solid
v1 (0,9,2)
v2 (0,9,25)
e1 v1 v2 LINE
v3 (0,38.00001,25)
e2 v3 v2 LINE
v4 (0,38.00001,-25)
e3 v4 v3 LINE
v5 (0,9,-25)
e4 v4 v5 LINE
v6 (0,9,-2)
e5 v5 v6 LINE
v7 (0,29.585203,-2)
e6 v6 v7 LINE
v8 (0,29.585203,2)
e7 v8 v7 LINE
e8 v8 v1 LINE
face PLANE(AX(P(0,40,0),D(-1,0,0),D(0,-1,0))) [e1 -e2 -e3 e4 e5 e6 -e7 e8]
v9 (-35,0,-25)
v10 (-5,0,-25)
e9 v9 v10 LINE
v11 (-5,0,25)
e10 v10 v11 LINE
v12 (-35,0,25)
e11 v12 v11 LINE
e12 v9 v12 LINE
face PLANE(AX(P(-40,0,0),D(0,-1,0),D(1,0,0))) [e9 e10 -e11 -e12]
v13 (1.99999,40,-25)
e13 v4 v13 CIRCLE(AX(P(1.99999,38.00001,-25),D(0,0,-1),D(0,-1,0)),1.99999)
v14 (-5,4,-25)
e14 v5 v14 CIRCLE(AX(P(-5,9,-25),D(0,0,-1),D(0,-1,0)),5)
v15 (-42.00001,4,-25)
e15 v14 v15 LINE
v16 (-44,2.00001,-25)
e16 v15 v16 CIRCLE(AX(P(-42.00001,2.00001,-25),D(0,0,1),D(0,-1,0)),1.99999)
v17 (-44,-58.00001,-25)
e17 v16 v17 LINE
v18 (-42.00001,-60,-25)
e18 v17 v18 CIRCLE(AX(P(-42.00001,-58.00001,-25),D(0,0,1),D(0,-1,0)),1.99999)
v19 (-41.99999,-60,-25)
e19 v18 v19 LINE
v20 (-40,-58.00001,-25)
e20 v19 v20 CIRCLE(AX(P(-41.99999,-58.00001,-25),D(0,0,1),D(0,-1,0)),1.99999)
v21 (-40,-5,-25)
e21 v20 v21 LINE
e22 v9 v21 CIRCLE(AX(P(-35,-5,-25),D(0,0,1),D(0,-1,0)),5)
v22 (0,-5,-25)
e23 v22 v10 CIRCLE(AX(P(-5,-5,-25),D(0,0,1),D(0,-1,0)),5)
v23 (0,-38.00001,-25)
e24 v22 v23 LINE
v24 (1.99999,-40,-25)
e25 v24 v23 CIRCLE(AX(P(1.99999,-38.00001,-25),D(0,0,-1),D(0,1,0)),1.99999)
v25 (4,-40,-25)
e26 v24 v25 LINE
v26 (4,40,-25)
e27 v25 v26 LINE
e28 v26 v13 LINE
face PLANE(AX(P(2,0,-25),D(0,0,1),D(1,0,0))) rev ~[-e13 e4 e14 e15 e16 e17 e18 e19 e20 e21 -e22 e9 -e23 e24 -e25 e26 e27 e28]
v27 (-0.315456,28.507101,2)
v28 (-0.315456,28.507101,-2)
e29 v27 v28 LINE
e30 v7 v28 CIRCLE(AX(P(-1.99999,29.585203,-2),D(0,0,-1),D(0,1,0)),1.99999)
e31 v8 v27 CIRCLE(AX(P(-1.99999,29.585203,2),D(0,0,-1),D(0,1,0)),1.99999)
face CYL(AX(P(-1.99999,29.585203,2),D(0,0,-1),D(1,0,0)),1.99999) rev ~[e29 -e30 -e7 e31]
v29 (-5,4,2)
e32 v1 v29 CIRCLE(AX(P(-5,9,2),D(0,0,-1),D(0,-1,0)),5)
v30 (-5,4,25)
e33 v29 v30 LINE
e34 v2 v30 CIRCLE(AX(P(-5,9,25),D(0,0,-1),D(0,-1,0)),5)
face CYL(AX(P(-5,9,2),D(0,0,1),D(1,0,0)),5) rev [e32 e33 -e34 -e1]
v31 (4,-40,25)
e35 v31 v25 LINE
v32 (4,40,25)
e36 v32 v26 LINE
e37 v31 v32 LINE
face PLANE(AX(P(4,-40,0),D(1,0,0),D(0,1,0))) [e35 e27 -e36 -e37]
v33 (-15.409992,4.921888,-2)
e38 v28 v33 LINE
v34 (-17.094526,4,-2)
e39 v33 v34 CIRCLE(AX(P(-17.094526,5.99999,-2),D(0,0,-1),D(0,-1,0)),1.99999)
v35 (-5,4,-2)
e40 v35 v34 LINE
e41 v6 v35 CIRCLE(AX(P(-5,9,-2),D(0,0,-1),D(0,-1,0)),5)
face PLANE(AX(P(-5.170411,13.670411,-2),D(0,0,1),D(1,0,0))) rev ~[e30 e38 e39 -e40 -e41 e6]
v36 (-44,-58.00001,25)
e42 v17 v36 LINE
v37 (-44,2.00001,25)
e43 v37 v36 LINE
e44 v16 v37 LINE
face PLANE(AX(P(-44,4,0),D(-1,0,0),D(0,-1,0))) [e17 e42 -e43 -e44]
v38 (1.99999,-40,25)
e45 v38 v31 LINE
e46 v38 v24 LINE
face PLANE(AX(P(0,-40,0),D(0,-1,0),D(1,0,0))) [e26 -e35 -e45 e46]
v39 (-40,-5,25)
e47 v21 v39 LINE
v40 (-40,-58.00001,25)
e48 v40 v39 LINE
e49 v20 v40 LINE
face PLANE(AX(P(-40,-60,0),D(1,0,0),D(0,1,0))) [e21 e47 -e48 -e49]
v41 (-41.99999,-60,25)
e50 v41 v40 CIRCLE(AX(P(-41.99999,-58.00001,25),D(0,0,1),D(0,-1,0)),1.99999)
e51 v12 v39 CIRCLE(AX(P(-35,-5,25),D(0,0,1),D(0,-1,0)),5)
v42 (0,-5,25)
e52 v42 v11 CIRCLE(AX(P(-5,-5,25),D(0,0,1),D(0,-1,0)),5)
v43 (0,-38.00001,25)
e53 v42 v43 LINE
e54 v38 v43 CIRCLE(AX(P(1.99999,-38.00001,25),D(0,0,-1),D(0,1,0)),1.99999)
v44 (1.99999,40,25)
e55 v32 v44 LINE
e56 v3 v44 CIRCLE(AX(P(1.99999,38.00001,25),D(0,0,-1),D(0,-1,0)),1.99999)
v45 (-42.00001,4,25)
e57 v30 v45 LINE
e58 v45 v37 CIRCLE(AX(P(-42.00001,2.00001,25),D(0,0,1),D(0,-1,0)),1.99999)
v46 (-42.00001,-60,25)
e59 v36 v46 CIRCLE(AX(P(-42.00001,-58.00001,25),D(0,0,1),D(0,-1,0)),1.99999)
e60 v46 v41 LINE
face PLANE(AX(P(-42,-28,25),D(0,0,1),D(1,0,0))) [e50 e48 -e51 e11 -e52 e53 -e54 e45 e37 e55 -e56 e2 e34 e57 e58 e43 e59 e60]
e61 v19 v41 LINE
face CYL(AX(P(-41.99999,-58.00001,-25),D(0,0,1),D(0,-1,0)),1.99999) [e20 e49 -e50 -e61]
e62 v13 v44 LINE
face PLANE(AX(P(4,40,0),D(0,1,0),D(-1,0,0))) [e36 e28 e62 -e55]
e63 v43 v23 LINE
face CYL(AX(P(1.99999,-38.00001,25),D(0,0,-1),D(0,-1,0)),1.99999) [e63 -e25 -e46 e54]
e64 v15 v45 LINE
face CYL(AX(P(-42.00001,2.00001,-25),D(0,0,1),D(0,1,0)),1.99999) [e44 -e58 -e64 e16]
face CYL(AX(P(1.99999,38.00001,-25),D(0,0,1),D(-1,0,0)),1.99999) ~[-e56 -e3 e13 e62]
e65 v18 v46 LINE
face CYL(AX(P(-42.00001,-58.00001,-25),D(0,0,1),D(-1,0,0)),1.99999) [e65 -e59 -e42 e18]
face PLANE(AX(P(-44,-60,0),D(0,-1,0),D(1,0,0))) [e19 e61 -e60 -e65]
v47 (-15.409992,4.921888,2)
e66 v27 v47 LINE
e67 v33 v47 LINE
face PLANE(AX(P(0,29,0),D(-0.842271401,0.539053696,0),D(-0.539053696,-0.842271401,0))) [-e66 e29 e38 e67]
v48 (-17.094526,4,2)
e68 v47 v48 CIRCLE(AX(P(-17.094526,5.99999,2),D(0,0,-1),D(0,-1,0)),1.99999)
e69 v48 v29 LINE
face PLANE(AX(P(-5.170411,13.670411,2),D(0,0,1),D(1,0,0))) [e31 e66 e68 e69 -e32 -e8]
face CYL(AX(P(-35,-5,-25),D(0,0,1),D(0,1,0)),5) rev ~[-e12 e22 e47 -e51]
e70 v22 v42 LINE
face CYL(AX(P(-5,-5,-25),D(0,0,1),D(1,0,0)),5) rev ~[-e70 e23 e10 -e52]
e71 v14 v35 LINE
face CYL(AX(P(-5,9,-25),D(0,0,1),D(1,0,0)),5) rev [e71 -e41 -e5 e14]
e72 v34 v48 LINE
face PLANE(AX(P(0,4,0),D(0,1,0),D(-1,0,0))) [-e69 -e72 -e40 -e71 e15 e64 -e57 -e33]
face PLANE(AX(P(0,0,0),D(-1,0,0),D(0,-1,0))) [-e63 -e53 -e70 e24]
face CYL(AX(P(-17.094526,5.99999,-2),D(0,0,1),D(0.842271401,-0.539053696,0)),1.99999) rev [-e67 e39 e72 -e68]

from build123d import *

# Parameters (mm, degrees)
F1_DEPTH      = 25
F2_DEPTH      = 25
F3_DEPTH      = 2
F3_DEPTH_BACK = 2
F4_R          = 5
F5_R          = 1.99999


# Not quite as in the source:
# - a fillet or chamfer is up to 0.001 mm smaller than in the source, because OpenCascade refuses the exact size


with BuildPart() as f1:
    # F0 (on Top) → F1 (new body)
    with BuildSketch(Plane.XY):
        Polygon((-40, 0), (-40, 4), (-44, 4), (-44, -60), (-40, -60), align=None)
        Polygon((0, 0), (0, 4), (-16, 4), (-40, 4), (-40, 0), align=None)
        Polygon((4, 40), (0, 40), (0, 29), (0, 4), (0, 0), (0, -40), (4, -40), align=None)
    extrude(amount=F1_DEPTH)

    # F0 (on Top) → F2 (join)
    with BuildSketch(Plane.XY):
        Polygon((4, 40), (0, 40), (0, 29), (0, 4), (0, 0), (0, -40), (4, -40), align=None)
        Polygon((0, 0), (0, 4), (-16, 4), (-40, 4), (-40, 0), align=None)
        Polygon((-40, 0), (-40, 4), (-44, 4), (-44, -60), (-40, -60), align=None)
    extrude(amount=-F2_DEPTH)

    # F0 (on Top) → F3 (join, two sides)
    with BuildSketch(Plane.XY) as f3_sk:
        Polygon((0, 4), (0, 29), (-16, 4), align=None)
    extrude(amount=F3_DEPTH)
    extrude(f3_sk.sketch, amount=-F3_DEPTH_BACK)

    # F4
    f4_edges = [f1.edges().sort_by_distance(p)[0] for p in [
        (-40, 0, 0),
        (0, 0, 0),
        (0, 4, 13.5),
        (0, 4, -13.5),
    ]]
    fillet(f4_edges, radius=F4_R)

    # F5 (radius 2 in the source; OpenCascade refuses exactly that, so slightly less here)
    f5_edges = [f1.edges().sort_by_distance(p)[0] for p in [
        (-44, 4, 0),
        (0, 40, 0),
        (-44, -60, 0),
        (-40, -60, 0),
        (0, -40, 0),
        (-16, 4, 0),
        (0, 29, 0),
    ]]
    fillet(f5_edges, radius=F5_R)


solid = f1.part
